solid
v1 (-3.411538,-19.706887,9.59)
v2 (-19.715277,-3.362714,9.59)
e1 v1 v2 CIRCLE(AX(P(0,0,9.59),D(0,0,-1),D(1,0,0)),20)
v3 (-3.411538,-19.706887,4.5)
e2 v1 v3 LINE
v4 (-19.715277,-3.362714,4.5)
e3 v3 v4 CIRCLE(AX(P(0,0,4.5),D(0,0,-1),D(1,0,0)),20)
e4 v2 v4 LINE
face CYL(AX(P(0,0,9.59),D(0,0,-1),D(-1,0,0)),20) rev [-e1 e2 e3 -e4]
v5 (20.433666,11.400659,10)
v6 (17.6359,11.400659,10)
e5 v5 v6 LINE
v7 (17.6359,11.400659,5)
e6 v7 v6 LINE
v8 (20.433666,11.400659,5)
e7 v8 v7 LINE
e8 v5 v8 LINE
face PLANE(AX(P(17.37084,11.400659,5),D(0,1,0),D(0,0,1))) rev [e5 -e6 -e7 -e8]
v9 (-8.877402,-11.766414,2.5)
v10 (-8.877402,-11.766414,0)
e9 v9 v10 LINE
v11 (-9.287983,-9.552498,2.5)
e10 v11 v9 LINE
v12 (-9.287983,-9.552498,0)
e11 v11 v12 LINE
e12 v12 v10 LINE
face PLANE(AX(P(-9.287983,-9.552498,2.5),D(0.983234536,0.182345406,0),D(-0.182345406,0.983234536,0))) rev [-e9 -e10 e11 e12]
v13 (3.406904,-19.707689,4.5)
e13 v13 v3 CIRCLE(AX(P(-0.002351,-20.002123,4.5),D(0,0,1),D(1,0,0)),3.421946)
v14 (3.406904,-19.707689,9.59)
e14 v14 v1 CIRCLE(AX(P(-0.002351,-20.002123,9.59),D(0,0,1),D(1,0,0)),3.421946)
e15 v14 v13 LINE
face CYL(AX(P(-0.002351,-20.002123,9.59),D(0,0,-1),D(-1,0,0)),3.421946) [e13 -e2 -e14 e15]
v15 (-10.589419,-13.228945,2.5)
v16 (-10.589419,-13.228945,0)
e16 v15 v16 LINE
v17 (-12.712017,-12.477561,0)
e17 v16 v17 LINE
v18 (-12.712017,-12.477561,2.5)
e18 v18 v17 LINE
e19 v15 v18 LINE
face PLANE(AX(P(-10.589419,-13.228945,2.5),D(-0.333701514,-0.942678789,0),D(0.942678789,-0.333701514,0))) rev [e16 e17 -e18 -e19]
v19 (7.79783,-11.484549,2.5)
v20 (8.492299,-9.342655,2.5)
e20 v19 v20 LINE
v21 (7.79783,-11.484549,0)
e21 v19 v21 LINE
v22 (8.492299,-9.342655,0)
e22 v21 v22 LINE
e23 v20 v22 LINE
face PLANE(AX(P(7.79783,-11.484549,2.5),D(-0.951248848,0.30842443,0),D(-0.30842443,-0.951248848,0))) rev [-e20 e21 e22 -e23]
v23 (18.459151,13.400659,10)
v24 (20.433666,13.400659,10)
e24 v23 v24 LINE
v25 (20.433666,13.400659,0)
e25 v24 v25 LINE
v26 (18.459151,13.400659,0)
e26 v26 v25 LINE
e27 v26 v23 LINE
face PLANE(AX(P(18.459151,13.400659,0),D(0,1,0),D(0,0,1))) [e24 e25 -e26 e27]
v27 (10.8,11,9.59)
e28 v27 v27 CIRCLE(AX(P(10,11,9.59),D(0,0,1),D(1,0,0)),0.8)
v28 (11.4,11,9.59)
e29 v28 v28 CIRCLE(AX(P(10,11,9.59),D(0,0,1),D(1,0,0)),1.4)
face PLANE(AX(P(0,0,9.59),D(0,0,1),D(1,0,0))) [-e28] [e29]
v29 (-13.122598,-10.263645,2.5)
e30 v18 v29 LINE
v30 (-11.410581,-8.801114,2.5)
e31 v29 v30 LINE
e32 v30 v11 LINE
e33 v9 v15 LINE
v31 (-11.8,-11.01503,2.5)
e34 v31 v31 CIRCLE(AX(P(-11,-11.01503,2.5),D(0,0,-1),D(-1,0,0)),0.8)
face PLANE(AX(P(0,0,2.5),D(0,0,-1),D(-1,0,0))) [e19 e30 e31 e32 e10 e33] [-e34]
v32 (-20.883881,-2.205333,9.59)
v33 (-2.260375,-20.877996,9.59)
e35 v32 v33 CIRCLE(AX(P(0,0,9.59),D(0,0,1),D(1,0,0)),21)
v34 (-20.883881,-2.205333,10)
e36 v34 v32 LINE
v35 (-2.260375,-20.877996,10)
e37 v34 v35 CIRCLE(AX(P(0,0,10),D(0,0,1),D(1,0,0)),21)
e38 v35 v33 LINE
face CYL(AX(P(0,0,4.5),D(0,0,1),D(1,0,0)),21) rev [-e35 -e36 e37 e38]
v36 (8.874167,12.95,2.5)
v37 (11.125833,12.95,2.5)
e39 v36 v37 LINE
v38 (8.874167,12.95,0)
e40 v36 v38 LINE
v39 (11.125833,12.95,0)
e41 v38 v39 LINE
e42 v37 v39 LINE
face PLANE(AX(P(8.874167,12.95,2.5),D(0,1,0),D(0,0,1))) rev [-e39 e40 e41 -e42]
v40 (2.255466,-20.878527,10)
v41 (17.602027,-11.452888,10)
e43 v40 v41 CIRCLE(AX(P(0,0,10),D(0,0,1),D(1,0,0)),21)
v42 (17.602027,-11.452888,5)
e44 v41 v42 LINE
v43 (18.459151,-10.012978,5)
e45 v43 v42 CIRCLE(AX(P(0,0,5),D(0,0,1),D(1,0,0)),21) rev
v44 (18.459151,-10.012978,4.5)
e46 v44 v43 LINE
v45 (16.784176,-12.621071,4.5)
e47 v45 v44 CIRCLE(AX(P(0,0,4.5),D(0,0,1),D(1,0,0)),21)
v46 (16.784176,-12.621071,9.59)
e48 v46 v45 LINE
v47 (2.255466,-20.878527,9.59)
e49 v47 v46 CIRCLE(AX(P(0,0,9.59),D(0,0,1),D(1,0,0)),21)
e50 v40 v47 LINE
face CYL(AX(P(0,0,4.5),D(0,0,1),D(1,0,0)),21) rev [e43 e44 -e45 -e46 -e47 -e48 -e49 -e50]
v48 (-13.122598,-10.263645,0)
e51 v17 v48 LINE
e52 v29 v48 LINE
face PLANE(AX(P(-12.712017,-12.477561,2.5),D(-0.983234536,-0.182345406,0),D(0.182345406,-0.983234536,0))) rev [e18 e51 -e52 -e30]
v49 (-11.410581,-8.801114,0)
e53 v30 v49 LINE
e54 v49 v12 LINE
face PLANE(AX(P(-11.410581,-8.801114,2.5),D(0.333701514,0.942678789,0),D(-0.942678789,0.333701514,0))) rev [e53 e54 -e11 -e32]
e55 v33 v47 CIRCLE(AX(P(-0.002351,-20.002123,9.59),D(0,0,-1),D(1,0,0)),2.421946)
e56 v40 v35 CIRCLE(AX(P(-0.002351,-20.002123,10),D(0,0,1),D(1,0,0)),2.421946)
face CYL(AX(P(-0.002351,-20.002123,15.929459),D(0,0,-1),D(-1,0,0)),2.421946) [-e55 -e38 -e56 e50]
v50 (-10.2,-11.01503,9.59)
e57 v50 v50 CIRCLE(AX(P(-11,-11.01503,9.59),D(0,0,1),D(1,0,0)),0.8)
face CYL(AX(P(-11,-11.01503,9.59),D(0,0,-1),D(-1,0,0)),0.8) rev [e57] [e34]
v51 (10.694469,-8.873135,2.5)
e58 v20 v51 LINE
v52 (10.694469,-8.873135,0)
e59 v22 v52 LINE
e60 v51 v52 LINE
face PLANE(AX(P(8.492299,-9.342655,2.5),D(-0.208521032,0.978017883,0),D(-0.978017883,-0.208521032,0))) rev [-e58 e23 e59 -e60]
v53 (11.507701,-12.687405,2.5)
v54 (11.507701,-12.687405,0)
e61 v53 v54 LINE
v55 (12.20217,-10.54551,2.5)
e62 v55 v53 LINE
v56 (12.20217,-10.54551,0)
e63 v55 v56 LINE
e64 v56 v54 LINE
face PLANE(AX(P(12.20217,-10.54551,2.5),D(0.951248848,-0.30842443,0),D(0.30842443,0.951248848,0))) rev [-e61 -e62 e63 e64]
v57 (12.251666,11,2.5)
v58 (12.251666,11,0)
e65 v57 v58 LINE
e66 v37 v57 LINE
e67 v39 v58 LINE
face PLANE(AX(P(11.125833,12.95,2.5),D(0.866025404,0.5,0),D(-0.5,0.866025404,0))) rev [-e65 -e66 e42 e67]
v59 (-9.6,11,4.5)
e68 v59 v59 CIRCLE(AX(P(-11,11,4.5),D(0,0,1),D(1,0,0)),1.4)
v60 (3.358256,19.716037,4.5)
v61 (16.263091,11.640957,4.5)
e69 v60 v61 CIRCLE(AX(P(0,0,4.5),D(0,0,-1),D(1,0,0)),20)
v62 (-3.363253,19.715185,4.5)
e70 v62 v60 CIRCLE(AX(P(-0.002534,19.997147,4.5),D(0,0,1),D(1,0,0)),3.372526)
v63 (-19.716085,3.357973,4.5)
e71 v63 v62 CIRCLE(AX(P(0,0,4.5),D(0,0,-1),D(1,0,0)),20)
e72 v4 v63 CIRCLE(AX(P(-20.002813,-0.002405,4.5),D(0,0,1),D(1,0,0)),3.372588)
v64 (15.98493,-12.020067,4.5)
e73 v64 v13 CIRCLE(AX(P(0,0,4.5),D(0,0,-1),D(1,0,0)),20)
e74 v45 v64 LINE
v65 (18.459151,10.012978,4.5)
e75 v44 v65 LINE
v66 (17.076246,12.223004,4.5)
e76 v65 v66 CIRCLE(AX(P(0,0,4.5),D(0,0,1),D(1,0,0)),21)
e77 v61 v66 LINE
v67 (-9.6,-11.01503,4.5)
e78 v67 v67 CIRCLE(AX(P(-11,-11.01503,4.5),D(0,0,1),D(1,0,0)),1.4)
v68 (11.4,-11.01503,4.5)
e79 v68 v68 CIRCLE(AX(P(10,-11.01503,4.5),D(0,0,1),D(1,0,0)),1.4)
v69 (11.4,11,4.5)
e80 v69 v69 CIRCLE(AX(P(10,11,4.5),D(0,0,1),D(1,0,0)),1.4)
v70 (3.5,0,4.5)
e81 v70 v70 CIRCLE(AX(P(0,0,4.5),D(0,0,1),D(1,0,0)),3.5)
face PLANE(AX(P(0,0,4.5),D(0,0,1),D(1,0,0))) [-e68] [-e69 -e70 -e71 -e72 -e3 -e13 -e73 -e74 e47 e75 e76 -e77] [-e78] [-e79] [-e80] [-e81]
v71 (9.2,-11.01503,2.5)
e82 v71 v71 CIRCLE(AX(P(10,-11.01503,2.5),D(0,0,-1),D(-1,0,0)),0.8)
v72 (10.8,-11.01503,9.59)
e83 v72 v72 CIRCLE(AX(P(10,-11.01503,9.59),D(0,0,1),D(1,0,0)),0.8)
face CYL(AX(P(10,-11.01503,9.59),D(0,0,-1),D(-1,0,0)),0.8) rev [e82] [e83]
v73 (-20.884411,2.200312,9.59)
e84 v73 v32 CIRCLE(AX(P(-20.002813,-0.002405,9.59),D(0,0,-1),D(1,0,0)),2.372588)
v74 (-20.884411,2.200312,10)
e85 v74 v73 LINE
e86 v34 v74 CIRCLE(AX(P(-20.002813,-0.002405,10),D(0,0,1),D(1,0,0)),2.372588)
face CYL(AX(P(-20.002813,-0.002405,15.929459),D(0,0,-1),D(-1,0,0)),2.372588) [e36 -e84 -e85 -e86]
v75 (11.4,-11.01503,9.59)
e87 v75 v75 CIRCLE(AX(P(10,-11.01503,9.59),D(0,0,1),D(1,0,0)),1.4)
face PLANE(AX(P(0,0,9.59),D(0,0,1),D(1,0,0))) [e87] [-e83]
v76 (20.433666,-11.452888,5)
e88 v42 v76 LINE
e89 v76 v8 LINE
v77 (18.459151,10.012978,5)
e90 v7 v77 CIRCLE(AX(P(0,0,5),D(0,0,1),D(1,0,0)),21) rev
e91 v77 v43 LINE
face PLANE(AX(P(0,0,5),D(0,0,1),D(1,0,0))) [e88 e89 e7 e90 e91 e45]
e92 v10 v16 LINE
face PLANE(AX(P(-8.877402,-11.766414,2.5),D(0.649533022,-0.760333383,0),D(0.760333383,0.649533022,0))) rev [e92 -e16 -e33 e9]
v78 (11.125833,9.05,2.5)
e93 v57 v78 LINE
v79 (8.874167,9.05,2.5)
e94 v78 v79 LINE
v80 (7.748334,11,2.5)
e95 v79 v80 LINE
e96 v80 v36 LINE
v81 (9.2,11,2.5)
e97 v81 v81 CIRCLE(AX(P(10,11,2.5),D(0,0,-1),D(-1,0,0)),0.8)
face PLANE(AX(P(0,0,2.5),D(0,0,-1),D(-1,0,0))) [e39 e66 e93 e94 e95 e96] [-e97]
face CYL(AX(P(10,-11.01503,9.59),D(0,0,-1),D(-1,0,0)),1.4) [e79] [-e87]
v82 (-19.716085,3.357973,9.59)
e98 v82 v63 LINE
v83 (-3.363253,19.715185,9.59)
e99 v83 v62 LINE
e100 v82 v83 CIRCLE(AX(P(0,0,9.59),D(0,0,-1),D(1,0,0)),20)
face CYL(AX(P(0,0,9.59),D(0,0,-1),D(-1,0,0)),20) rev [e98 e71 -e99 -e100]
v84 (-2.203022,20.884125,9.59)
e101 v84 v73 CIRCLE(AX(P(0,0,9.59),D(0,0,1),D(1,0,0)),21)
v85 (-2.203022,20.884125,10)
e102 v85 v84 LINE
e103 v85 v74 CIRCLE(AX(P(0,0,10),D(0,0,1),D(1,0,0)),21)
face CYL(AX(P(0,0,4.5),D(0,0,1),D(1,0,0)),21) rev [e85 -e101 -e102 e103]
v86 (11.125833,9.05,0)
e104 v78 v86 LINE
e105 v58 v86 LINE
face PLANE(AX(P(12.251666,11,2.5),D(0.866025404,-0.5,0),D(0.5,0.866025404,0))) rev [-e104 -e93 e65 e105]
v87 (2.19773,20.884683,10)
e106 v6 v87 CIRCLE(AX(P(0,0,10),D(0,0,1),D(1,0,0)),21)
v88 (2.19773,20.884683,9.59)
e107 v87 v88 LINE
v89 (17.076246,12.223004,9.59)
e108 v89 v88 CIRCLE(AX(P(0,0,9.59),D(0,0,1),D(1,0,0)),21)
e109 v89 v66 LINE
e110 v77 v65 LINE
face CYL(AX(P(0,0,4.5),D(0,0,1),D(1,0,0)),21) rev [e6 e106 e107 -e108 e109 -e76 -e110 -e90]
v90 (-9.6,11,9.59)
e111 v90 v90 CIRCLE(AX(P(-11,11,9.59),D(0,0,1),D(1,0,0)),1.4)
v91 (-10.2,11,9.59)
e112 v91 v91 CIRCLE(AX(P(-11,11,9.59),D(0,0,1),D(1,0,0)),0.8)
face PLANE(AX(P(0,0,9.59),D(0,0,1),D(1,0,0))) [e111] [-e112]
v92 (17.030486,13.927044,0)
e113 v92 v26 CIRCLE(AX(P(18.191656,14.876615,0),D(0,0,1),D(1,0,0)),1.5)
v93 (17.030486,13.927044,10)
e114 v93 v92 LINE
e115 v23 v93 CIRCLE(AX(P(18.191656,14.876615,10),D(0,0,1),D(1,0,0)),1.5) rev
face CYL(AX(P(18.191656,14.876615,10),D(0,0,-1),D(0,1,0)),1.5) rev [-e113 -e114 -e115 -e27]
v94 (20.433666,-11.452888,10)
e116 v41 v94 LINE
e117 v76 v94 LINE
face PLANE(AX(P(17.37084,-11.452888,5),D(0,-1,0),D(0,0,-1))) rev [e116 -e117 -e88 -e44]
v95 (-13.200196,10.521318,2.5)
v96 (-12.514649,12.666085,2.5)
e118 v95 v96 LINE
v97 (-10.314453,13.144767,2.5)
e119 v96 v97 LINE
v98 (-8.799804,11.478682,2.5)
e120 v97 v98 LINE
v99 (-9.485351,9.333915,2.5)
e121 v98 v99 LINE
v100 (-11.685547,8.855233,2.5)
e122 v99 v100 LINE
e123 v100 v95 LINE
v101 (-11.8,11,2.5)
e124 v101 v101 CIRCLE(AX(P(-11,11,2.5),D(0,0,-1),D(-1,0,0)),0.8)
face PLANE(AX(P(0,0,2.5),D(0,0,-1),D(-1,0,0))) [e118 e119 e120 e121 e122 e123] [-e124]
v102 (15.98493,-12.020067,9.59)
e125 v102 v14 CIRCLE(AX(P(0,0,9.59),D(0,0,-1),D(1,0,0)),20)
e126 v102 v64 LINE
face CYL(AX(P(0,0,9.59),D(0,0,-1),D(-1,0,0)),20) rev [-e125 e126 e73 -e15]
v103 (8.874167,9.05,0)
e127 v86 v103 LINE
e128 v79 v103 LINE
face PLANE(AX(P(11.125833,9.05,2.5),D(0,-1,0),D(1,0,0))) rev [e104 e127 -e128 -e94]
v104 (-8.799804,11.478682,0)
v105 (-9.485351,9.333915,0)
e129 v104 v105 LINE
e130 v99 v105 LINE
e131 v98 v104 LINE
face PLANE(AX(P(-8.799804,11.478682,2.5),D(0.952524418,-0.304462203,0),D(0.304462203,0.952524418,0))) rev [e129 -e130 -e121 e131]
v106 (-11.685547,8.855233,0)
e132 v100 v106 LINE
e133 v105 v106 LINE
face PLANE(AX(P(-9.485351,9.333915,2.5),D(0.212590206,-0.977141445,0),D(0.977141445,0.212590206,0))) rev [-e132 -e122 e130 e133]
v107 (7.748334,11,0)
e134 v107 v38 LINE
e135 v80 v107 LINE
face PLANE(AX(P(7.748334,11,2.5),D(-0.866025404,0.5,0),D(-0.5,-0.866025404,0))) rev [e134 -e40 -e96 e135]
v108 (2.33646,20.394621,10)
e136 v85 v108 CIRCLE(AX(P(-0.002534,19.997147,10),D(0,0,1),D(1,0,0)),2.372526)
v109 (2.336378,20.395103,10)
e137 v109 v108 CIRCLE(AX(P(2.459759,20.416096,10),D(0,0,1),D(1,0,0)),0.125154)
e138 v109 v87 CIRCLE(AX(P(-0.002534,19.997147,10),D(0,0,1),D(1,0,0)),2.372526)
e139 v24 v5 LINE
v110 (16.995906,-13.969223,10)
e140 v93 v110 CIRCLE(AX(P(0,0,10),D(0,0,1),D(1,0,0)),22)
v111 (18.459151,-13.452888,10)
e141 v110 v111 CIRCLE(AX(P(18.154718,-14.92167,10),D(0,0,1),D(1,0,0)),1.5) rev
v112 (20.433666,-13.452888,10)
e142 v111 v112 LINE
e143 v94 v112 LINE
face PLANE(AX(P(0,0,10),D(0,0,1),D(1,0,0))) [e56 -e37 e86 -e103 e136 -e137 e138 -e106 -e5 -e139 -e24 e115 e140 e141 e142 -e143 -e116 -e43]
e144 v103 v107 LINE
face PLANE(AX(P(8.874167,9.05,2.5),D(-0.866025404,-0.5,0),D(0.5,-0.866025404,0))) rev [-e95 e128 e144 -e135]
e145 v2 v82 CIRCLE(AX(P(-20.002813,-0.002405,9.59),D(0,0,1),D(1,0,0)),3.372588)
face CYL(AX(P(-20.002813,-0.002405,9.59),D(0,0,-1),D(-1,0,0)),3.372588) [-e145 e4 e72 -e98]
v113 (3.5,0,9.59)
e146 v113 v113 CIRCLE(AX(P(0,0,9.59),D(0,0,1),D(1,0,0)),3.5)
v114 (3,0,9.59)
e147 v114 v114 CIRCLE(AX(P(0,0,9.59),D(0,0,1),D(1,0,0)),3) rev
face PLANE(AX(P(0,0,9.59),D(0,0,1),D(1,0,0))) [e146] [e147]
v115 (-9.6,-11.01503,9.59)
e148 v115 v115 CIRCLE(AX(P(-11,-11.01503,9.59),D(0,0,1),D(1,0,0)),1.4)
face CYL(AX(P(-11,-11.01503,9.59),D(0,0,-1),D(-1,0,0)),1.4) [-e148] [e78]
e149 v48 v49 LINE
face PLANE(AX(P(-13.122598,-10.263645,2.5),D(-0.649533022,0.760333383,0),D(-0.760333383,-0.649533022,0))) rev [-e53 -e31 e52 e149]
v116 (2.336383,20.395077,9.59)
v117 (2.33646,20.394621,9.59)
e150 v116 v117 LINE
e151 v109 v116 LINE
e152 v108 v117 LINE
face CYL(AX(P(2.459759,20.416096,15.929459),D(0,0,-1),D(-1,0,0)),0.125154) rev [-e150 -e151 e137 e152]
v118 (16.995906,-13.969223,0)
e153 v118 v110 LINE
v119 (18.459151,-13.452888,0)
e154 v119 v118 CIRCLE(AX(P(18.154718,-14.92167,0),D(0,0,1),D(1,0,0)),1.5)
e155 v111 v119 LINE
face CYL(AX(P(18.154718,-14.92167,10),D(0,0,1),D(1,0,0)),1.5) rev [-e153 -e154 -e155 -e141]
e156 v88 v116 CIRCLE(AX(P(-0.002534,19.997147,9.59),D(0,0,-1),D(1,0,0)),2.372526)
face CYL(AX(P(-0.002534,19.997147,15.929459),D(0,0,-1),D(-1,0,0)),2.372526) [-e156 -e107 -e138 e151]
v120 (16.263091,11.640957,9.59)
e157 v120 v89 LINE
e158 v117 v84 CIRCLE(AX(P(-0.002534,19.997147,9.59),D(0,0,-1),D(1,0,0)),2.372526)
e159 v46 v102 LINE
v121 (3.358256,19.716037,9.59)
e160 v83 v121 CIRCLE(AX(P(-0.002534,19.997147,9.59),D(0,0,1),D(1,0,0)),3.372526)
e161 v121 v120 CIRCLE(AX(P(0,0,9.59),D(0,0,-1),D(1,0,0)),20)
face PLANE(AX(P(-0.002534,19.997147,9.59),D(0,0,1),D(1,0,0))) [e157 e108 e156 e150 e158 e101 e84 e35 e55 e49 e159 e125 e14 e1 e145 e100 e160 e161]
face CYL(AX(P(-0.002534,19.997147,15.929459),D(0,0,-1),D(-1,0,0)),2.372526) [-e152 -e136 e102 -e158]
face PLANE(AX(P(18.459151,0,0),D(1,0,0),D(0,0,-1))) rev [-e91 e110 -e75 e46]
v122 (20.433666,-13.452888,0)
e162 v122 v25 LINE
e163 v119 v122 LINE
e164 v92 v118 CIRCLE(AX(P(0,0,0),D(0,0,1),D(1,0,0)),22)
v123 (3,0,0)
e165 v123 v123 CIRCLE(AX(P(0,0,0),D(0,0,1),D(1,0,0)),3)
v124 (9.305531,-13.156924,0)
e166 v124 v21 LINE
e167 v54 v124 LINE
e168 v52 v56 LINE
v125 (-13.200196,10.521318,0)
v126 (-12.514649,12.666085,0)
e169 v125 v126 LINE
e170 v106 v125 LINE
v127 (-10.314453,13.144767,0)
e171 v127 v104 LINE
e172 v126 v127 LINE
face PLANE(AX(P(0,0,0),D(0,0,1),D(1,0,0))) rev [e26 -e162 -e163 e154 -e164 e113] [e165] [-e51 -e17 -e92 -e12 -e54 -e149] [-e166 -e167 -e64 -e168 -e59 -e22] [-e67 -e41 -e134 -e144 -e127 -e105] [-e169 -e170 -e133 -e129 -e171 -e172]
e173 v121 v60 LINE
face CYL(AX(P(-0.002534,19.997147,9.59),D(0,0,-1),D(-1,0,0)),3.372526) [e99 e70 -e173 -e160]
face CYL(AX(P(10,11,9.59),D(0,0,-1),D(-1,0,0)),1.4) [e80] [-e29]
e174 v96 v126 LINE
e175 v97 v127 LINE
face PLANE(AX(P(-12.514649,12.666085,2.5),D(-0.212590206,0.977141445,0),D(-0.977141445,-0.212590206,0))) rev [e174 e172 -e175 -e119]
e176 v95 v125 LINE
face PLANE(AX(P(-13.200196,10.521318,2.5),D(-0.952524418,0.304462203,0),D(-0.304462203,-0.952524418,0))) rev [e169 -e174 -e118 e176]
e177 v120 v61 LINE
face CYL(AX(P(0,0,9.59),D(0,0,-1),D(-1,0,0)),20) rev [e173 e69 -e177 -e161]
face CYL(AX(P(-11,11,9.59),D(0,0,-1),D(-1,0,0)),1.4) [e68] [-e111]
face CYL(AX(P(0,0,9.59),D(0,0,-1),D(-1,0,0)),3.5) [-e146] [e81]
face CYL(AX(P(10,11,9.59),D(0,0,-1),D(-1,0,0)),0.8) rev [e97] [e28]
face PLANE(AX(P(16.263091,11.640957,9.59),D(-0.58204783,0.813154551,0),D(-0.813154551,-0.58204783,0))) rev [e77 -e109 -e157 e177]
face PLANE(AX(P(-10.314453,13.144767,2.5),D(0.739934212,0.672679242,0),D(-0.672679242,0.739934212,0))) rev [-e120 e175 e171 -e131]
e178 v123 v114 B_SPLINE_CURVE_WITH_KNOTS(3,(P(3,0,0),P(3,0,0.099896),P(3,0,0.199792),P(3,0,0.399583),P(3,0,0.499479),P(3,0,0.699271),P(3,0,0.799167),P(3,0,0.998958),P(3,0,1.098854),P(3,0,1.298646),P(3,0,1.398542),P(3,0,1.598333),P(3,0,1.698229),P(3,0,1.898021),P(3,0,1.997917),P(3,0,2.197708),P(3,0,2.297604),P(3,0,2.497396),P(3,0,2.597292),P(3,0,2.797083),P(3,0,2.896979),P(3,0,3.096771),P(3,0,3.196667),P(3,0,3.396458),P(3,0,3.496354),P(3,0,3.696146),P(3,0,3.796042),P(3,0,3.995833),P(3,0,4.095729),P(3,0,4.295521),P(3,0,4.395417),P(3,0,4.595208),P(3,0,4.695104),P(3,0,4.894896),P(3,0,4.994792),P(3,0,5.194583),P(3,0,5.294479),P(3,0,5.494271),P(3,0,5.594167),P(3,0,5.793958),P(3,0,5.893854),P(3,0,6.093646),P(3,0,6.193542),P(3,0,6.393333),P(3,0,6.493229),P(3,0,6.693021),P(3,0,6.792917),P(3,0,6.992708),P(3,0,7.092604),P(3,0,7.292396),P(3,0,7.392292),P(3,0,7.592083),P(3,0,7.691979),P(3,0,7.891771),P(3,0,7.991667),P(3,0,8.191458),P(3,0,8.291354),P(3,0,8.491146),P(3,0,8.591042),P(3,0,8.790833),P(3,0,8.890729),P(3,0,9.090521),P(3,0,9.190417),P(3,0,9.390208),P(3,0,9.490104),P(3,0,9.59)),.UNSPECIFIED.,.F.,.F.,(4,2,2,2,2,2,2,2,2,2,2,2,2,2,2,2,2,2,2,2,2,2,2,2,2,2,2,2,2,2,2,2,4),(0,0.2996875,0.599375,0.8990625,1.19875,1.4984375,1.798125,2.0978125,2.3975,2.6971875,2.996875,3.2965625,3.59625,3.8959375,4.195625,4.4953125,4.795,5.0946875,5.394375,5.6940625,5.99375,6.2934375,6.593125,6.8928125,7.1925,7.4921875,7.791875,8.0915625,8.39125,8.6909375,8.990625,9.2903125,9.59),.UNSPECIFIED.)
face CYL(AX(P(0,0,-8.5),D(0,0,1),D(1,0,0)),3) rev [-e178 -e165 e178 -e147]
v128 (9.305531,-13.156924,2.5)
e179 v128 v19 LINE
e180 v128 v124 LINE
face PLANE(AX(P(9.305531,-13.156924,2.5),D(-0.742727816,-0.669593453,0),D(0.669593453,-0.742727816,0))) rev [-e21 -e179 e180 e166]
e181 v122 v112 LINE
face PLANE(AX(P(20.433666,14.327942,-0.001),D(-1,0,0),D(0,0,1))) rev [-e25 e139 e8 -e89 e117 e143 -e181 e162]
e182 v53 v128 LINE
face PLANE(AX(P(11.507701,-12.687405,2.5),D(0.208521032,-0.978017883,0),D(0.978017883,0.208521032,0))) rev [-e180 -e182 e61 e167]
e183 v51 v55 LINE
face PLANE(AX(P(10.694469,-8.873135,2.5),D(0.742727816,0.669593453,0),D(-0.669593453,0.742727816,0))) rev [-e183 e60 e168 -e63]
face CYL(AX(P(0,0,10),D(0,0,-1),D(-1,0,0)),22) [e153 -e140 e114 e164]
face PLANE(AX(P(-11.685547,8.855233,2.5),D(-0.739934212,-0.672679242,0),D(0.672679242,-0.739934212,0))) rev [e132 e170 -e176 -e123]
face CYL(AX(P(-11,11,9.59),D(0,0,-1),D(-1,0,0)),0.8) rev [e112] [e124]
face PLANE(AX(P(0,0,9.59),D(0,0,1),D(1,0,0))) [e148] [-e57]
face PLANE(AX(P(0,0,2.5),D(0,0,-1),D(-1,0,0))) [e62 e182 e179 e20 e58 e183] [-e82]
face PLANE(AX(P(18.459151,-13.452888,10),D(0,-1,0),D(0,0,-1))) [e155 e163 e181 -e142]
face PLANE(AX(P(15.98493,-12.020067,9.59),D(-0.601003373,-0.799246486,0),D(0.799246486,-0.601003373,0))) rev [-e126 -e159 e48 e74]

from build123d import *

# Parameters (mm, degrees)
SKETCH2_R                 = 22
BOSS_EXTRUDE1_DEPTH       = 10
SKETCH3_R                 = 21
CUT_EXTRUDE2_DEPTH        = 5.5
SKETCH4_R                 = 1.4
SKETCH4_R_2               = 0.8
BOSS_EXTRUDE2_DEPTH       = 5.09
SKETCH5_R                 = 3
CUT_EXTRUDE3_DEPTH        = 13
BOSS_EXTRUDE3_START       = 5.09
SKETCH6_R                 = 3.5
SKETCH6_R_2               = 3
BOSS_EXTRUDE3_DEPTH       = 5.09
SKETCH18_R                = 0.8
CUT_EXTRUDE7_DEPTH        = 33.557151288
SKETCH20_W                = 10.090622296
SKETCH20_H                = 22.853546686
CUT_EXTRUDE8_DEPTH        = 5
BOSS_EXTRUDE12_DEPTH      = 0.5
BOSS_EXTRUDE12_DEPTH_BACK = 2
FILLET3_R                 = 1.5
CUT_EXTRUDE9_REACH        = 34.68
SKETCH25_W                = 14.266365092
SKETCH25_H                = 28.452518254
BOSS_EXTRUDE14_START      = 5.5
BOSS_EXTRUDE14_DEPTH      = 5.5
BOSS_EXTRUDE15_START      = 5.09
BOSS_EXTRUDE15_DEPTH      = 5.09
SKETCH36_R                = 0.8
CUT_EXTRUDE10_DEPTH       = 2.5


with BuildPart() as part:
    # Sketch2 → Boss-Extrude1 (new body)
    with BuildSketch(Plane.XY):
        Circle(SKETCH2_R)
    extrude(amount=BOSS_EXTRUDE1_DEPTH)

    # Sketch3 → Cut-Extrude2 (cut)
    with BuildSketch(Plane.XY.offset(10)):
        Circle(SKETCH3_R)
    extrude(amount=-CUT_EXTRUDE2_DEPTH, mode=Mode.SUBTRACT)

    # Sketch4 → Boss-Extrude2 (add)
    # profile 1 of 4: a face of its own
    with BuildSketch(Plane.XY.offset(4.5)):
        with Locations((-11, 11)):
            Circle(SKETCH4_R)
        with Locations((-11, 11)):
            Circle(SKETCH4_R_2, mode=Mode.SUBTRACT)
    # profile 2 of 4: a face of its own
    with BuildSketch(Plane.XY.offset(4.5)):
        with Locations((10, 11)):
            Circle(SKETCH4_R)
        with Locations((10, 11)):
            Circle(SKETCH4_R_2, mode=Mode.SUBTRACT)
    # profile 3 of 4: a face of its own
    with BuildSketch(Plane.XY.offset(4.5)):
        with Locations((10, -11.015029648)):
            Circle(SKETCH4_R)
        with Locations((10, -11.015029648)):
            Circle(SKETCH4_R_2, mode=Mode.SUBTRACT)
    # profile 4 of 4: a face of its own
    with BuildSketch(Plane.XY.offset(4.5)):
        with Locations((-11, -11.015029648)):
            Circle(SKETCH4_R)
        with Locations((-11, -11.015029648)):
            Circle(SKETCH4_R_2, mode=Mode.SUBTRACT)
    extrude(amount=BOSS_EXTRUDE2_DEPTH)

    # Sketch5 → Cut-Extrude3 (cut)
    with BuildSketch(Plane.XY.offset(4.5)):
        Circle(SKETCH5_R)
    extrude(amount=-CUT_EXTRUDE3_DEPTH, mode=Mode.SUBTRACT)

    # Sketch6 → Boss-Extrude3 (add)
    with BuildSketch(Plane.XY.offset(4.5).offset(BOSS_EXTRUDE3_START)):
        Circle(SKETCH6_R)
        Circle(SKETCH6_R_2, mode=Mode.SUBTRACT)
    extrude(amount=-BOSS_EXTRUDE3_DEPTH)

    # Sketch18 → Cut-Extrude7 (cut, through all)
    with BuildSketch(Plane.XY.offset(9.59)):
        with Locations((-11, 11)):
            Circle(SKETCH18_R)
        with Locations((10, 11)):
            Circle(SKETCH18_R)
        with Locations((10, -11.015029648)):
            Circle(SKETCH18_R)
        with Locations((-11, -11.015029648)):
            Circle(SKETCH18_R)
    extrude(amount=-CUT_EXTRUDE7_DEPTH, mode=Mode.SUBTRACT)

    # Sketch20 → Cut-Extrude8 (cut)
    with BuildSketch(Plane.XY.offset(10)):
        with Locations((22.416150926, -0.026114621)):
            Rectangle(SKETCH20_W, SKETCH20_H)
    extrude(amount=-CUT_EXTRUDE8_DEPTH, mode=Mode.SUBTRACT)

    # Sketch24 → Boss-Extrude12 (add, two sides: drawn at the far end of the back side and taken through both)
    with BuildSketch(Plane(origin=(20.459151462, 0, 0), x_dir=(0, 0, -1), z_dir=(1, 0, 0)).offset(-BOSS_EXTRUDE12_DEPTH_BACK)):
        Polygon((-10, 11.400658722), (-5, 11.400658722), (-5, -11.452887964), (-10, -11.452887964), (-10, -13.452887964), (0, -13.452887964), (0, 13.400658722), (-10, 13.400658722), align=None)
    extrude(amount=BOSS_EXTRUDE12_DEPTH + BOSS_EXTRUDE12_DEPTH_BACK)

    # Fillet3
    # the kernel refuses this fillet: 1.5 mm, written as the material it adds along each edge
    with BuildSketch(Plane(origin=(18.459151462, -11.96911556, 10), x_dir=(-0.5904449589770525, -0.8070779085184941, 0), z_dir=(0, 0, -1))) as fillet3_piece_1:
        with BuildLine():
            CenterArc((2.562692726, -1.497618907), FILLET3_R, 93.228774065, 62.292501853)
            Line((1.197519929, -0.876085936), (1.170216473, -0.863655277))
            ThreePointArc((1.170216473, -0.863655277), (0.581046616, -0.462255305), (-0.017713349, -0.024212337))
            Line((-0.017713349, -0.024212337), (0.001689688, 0.029952378))
            ThreePointArc((0.001689688, 0.029952378), (1.239104175, -0.004922699), (2.476518663, 0.029952378))
            Line((2.476518663, 0.029952378), (2.47820835, 0))
        make_face()
    extrude(amount=10)
    with BuildSketch(Plane(origin=(18.459151462, 11.96911556, 10), x_dir=(0, 1, 0), z_dir=(0, 0, -1))) as fillet3_piece_2:
        with BuildLine():
            CenterArc((2.907499122, -0.267495804), FILLET3_R, 169.727466674, 60.997217104)
            Line((1.957927972, -1.428665314), (1.938936549, -1.451888704))
            ThreePointArc((1.938936549, -1.451888704), (0.980970205, -0.711583215), (-0.016321521, -0.02517157))
            Line((-0.016321521, -0.02517157), (0, 0.03))
            ThreePointArc((0, 0.03), (0.715771581, 0.03), (1.402024043, 0.005349916))
            Line((1.402024043, 0.005349916), (1.431543163, 0))
        make_face()
    extrude(amount=10)

    # Sketch25 → Cut-Extrude9 (cut, up to next)
    with BuildSketch(Plane.XY.offset(10), mode=Mode.PRIVATE) as cut_extrude9_sk1:
        with Locations((27.566848105, 0.101683084)):
            Rectangle(SKETCH25_W, SKETCH25_H)
    cut_extrude9_tool1 = extrude(cut_extrude9_sk1.sketch, amount=-CUT_EXTRUDE9_REACH, mode=Mode.PRIVATE) & part.part
    add(cut_extrude9_tool1.solids().sort_by_distance((27.566848, 0.101683, 10))[0], mode=Mode.SUBTRACT)

    # Sketch30 → Boss-Extrude14 (add)
    with BuildSketch(Plane.XY.offset(4.5).offset(BOSS_EXTRUDE14_START)):
        with BuildLine():
            ThreePointArc((2.255465854, -20.878526619), (-0.002066694, -17.580176404), (-2.260374676, -20.877995745))
            ThreePointArc((-2.260374676, -20.877995745), (-0.002468723, -20.999999855), (2.255465854, -20.878526619))
        make_face()
        with BuildLine():
            ThreePointArc((-2.203022296, 20.884125377), (-0.002233305, 17.624620846), (2.197729558, 20.884683019))
            ThreePointArc((2.197729558, 20.884683019), (-0.002661017, 20.999999831), (-2.203022296, 20.884125377))
        make_face()
        with BuildLine():
            ThreePointArc((-20.883881485, -2.205333104), (-17.630224728, -0.00211959), (-20.884411153, 2.200311519))
            ThreePointArc((-20.884411153, 2.200311519), (-20.999999848, -0.002524721), (-20.883881485, -2.205333104))
        make_face()
    extrude(amount=-BOSS_EXTRUDE14_DEPTH)

    # Sketch33 → Boss-Extrude15 (add)
    with BuildSketch(Plane.XY.offset(4.5).offset(BOSS_EXTRUDE15_START)):
        with BuildLine():
            Line((16.263091014, 11.640956604), (17.076245565, 12.223004435))
            ThreePointArc((17.076245565, 12.223004435), (10.565400997, 18.148617076), (2.197729558, 20.884683019))
            ThreePointArc((2.197729558, 20.884683019), (2.280216576, 20.643620919), (2.336378022, 20.395103458))
            ThreePointArc((2.336378022, 20.395103458), (-0.256894976, 17.638295394), (-2.203022296, 20.884125377))
            ThreePointArc((-2.203022296, 20.884125377), (-14.850206089, 14.848278658), (-20.884411153, 2.200311519))
            ThreePointArc((-20.884411153, 2.200311519), (-17.630224728, -0.00211959), (-20.883881485, -2.205333104))
            ThreePointArc((-20.883881485, -2.205333104), (-14.868800585, -14.82965843), (-2.260374676, -20.877995745))
            ThreePointArc((-2.260374676, -20.877995745), (-0.002066694, -17.580176404), (2.255465854, -20.878526619))
            ThreePointArc((2.255465854, -20.878526619), (10.376578748, -18.257234552), (16.784176211, -12.621070831))
            Line((16.784176211, -12.621070831), (15.984929724, -12.020067458))
            ThreePointArc((15.984929724, -12.020067458), (10.430037734, -17.065002575), (3.406904238, -19.707688944))
            ThreePointArc((3.406904238, -19.707688944), (-0.001949136, -16.580176411), (-3.411537746, -19.70688738))
            ThreePointArc((-3.411537746, -19.70688738), (-14.159639755, -14.1246098), (-19.715277269, -3.362713518))
            ThreePointArc((-19.715277269, -3.362713518), (-16.630224735, -0.001999366), (-19.716085262, 3.35797289))
            ThreePointArc((-19.716085262, 3.35797289), (-14.144029066, 14.140241928), (-3.36325256, 19.71518532))
            ThreePointArc((-3.36325256, 19.71518532), (-0.00210659, 16.624620854), (3.358256029, 19.716037037))
            ThreePointArc((3.358256029, 19.716037037), (10.609007774, 16.954319628), (16.263091014, 11.640956604))
        make_face()
    extrude(amount=-BOSS_EXTRUDE15_DEPTH)

    # Sketch36 → Cut-Extrude10 (cut)
    # profile 1 of 4: a face of its own
    with BuildSketch(Plane(origin=(0, 0, 0), x_dir=(-1, 0, 0), z_dir=(0, 0, -1))):
        Polygon((-7.74833395, 11), (-8.874166975, 12.95), (-11.125833025, 12.95), (-12.25166605, 11), (-11.125833025, 9.05), (-8.874166975, 9.05), align=None)
        with Locations((-10, 11)):
            Circle(SKETCH36_R, mode=Mode.SUBTRACT)
    # profile 2 of 4: a face of its own
    with BuildSketch(Plane(origin=(0, 0, 0), x_dir=(-1, 0, 0), z_dir=(0, 0, -1))):
        Polygon((12.514649012, 12.666084743), (10.314452793, 13.144766893), (8.799803782, 11.47868215), (9.485350988, 9.333915257), (11.685547207, 8.855233107), (13.200196218, 10.52131785), align=None)
        with Locations((11, 11)):
            Circle(SKETCH36_R, mode=Mode.SUBTRACT)
    # profile 3 of 4: a face of its own
    with BuildSketch(Plane(origin=(0, 0, 0), x_dir=(-1, 0, 0), z_dir=(0, 0, -1))):
        Polygon((13.122597825, -10.263645278), (11.41058096, -8.801113824), (9.287983135, -9.552498195), (8.877402175, -11.766414018), (10.58941904, -13.228945472), (12.712016865, -12.477561101), align=None)
        with Locations((11, -11.015029648)):
            Circle(SKETCH36_R, mode=Mode.SUBTRACT)
    # profile 4 of 4: a face of its own
    with BuildSketch(Plane(origin=(0, 0, 0), x_dir=(-1, 0, 0), z_dir=(0, 0, -1))):
        Polygon((-8.492299155, -9.342654641), (-10.694468818, -8.873134912), (-12.202169663, -10.545509919), (-11.507700845, -12.687404655), (-9.305531182, -13.156924384), (-7.797830337, -11.484549377), align=None)
        with Locations((-10, -11.015029648)):
            Circle(SKETCH36_R, mode=Mode.SUBTRACT)
    extrude(amount=-CUT_EXTRUDE10_DEPTH, mode=Mode.SUBTRACT)


solid = part.part
